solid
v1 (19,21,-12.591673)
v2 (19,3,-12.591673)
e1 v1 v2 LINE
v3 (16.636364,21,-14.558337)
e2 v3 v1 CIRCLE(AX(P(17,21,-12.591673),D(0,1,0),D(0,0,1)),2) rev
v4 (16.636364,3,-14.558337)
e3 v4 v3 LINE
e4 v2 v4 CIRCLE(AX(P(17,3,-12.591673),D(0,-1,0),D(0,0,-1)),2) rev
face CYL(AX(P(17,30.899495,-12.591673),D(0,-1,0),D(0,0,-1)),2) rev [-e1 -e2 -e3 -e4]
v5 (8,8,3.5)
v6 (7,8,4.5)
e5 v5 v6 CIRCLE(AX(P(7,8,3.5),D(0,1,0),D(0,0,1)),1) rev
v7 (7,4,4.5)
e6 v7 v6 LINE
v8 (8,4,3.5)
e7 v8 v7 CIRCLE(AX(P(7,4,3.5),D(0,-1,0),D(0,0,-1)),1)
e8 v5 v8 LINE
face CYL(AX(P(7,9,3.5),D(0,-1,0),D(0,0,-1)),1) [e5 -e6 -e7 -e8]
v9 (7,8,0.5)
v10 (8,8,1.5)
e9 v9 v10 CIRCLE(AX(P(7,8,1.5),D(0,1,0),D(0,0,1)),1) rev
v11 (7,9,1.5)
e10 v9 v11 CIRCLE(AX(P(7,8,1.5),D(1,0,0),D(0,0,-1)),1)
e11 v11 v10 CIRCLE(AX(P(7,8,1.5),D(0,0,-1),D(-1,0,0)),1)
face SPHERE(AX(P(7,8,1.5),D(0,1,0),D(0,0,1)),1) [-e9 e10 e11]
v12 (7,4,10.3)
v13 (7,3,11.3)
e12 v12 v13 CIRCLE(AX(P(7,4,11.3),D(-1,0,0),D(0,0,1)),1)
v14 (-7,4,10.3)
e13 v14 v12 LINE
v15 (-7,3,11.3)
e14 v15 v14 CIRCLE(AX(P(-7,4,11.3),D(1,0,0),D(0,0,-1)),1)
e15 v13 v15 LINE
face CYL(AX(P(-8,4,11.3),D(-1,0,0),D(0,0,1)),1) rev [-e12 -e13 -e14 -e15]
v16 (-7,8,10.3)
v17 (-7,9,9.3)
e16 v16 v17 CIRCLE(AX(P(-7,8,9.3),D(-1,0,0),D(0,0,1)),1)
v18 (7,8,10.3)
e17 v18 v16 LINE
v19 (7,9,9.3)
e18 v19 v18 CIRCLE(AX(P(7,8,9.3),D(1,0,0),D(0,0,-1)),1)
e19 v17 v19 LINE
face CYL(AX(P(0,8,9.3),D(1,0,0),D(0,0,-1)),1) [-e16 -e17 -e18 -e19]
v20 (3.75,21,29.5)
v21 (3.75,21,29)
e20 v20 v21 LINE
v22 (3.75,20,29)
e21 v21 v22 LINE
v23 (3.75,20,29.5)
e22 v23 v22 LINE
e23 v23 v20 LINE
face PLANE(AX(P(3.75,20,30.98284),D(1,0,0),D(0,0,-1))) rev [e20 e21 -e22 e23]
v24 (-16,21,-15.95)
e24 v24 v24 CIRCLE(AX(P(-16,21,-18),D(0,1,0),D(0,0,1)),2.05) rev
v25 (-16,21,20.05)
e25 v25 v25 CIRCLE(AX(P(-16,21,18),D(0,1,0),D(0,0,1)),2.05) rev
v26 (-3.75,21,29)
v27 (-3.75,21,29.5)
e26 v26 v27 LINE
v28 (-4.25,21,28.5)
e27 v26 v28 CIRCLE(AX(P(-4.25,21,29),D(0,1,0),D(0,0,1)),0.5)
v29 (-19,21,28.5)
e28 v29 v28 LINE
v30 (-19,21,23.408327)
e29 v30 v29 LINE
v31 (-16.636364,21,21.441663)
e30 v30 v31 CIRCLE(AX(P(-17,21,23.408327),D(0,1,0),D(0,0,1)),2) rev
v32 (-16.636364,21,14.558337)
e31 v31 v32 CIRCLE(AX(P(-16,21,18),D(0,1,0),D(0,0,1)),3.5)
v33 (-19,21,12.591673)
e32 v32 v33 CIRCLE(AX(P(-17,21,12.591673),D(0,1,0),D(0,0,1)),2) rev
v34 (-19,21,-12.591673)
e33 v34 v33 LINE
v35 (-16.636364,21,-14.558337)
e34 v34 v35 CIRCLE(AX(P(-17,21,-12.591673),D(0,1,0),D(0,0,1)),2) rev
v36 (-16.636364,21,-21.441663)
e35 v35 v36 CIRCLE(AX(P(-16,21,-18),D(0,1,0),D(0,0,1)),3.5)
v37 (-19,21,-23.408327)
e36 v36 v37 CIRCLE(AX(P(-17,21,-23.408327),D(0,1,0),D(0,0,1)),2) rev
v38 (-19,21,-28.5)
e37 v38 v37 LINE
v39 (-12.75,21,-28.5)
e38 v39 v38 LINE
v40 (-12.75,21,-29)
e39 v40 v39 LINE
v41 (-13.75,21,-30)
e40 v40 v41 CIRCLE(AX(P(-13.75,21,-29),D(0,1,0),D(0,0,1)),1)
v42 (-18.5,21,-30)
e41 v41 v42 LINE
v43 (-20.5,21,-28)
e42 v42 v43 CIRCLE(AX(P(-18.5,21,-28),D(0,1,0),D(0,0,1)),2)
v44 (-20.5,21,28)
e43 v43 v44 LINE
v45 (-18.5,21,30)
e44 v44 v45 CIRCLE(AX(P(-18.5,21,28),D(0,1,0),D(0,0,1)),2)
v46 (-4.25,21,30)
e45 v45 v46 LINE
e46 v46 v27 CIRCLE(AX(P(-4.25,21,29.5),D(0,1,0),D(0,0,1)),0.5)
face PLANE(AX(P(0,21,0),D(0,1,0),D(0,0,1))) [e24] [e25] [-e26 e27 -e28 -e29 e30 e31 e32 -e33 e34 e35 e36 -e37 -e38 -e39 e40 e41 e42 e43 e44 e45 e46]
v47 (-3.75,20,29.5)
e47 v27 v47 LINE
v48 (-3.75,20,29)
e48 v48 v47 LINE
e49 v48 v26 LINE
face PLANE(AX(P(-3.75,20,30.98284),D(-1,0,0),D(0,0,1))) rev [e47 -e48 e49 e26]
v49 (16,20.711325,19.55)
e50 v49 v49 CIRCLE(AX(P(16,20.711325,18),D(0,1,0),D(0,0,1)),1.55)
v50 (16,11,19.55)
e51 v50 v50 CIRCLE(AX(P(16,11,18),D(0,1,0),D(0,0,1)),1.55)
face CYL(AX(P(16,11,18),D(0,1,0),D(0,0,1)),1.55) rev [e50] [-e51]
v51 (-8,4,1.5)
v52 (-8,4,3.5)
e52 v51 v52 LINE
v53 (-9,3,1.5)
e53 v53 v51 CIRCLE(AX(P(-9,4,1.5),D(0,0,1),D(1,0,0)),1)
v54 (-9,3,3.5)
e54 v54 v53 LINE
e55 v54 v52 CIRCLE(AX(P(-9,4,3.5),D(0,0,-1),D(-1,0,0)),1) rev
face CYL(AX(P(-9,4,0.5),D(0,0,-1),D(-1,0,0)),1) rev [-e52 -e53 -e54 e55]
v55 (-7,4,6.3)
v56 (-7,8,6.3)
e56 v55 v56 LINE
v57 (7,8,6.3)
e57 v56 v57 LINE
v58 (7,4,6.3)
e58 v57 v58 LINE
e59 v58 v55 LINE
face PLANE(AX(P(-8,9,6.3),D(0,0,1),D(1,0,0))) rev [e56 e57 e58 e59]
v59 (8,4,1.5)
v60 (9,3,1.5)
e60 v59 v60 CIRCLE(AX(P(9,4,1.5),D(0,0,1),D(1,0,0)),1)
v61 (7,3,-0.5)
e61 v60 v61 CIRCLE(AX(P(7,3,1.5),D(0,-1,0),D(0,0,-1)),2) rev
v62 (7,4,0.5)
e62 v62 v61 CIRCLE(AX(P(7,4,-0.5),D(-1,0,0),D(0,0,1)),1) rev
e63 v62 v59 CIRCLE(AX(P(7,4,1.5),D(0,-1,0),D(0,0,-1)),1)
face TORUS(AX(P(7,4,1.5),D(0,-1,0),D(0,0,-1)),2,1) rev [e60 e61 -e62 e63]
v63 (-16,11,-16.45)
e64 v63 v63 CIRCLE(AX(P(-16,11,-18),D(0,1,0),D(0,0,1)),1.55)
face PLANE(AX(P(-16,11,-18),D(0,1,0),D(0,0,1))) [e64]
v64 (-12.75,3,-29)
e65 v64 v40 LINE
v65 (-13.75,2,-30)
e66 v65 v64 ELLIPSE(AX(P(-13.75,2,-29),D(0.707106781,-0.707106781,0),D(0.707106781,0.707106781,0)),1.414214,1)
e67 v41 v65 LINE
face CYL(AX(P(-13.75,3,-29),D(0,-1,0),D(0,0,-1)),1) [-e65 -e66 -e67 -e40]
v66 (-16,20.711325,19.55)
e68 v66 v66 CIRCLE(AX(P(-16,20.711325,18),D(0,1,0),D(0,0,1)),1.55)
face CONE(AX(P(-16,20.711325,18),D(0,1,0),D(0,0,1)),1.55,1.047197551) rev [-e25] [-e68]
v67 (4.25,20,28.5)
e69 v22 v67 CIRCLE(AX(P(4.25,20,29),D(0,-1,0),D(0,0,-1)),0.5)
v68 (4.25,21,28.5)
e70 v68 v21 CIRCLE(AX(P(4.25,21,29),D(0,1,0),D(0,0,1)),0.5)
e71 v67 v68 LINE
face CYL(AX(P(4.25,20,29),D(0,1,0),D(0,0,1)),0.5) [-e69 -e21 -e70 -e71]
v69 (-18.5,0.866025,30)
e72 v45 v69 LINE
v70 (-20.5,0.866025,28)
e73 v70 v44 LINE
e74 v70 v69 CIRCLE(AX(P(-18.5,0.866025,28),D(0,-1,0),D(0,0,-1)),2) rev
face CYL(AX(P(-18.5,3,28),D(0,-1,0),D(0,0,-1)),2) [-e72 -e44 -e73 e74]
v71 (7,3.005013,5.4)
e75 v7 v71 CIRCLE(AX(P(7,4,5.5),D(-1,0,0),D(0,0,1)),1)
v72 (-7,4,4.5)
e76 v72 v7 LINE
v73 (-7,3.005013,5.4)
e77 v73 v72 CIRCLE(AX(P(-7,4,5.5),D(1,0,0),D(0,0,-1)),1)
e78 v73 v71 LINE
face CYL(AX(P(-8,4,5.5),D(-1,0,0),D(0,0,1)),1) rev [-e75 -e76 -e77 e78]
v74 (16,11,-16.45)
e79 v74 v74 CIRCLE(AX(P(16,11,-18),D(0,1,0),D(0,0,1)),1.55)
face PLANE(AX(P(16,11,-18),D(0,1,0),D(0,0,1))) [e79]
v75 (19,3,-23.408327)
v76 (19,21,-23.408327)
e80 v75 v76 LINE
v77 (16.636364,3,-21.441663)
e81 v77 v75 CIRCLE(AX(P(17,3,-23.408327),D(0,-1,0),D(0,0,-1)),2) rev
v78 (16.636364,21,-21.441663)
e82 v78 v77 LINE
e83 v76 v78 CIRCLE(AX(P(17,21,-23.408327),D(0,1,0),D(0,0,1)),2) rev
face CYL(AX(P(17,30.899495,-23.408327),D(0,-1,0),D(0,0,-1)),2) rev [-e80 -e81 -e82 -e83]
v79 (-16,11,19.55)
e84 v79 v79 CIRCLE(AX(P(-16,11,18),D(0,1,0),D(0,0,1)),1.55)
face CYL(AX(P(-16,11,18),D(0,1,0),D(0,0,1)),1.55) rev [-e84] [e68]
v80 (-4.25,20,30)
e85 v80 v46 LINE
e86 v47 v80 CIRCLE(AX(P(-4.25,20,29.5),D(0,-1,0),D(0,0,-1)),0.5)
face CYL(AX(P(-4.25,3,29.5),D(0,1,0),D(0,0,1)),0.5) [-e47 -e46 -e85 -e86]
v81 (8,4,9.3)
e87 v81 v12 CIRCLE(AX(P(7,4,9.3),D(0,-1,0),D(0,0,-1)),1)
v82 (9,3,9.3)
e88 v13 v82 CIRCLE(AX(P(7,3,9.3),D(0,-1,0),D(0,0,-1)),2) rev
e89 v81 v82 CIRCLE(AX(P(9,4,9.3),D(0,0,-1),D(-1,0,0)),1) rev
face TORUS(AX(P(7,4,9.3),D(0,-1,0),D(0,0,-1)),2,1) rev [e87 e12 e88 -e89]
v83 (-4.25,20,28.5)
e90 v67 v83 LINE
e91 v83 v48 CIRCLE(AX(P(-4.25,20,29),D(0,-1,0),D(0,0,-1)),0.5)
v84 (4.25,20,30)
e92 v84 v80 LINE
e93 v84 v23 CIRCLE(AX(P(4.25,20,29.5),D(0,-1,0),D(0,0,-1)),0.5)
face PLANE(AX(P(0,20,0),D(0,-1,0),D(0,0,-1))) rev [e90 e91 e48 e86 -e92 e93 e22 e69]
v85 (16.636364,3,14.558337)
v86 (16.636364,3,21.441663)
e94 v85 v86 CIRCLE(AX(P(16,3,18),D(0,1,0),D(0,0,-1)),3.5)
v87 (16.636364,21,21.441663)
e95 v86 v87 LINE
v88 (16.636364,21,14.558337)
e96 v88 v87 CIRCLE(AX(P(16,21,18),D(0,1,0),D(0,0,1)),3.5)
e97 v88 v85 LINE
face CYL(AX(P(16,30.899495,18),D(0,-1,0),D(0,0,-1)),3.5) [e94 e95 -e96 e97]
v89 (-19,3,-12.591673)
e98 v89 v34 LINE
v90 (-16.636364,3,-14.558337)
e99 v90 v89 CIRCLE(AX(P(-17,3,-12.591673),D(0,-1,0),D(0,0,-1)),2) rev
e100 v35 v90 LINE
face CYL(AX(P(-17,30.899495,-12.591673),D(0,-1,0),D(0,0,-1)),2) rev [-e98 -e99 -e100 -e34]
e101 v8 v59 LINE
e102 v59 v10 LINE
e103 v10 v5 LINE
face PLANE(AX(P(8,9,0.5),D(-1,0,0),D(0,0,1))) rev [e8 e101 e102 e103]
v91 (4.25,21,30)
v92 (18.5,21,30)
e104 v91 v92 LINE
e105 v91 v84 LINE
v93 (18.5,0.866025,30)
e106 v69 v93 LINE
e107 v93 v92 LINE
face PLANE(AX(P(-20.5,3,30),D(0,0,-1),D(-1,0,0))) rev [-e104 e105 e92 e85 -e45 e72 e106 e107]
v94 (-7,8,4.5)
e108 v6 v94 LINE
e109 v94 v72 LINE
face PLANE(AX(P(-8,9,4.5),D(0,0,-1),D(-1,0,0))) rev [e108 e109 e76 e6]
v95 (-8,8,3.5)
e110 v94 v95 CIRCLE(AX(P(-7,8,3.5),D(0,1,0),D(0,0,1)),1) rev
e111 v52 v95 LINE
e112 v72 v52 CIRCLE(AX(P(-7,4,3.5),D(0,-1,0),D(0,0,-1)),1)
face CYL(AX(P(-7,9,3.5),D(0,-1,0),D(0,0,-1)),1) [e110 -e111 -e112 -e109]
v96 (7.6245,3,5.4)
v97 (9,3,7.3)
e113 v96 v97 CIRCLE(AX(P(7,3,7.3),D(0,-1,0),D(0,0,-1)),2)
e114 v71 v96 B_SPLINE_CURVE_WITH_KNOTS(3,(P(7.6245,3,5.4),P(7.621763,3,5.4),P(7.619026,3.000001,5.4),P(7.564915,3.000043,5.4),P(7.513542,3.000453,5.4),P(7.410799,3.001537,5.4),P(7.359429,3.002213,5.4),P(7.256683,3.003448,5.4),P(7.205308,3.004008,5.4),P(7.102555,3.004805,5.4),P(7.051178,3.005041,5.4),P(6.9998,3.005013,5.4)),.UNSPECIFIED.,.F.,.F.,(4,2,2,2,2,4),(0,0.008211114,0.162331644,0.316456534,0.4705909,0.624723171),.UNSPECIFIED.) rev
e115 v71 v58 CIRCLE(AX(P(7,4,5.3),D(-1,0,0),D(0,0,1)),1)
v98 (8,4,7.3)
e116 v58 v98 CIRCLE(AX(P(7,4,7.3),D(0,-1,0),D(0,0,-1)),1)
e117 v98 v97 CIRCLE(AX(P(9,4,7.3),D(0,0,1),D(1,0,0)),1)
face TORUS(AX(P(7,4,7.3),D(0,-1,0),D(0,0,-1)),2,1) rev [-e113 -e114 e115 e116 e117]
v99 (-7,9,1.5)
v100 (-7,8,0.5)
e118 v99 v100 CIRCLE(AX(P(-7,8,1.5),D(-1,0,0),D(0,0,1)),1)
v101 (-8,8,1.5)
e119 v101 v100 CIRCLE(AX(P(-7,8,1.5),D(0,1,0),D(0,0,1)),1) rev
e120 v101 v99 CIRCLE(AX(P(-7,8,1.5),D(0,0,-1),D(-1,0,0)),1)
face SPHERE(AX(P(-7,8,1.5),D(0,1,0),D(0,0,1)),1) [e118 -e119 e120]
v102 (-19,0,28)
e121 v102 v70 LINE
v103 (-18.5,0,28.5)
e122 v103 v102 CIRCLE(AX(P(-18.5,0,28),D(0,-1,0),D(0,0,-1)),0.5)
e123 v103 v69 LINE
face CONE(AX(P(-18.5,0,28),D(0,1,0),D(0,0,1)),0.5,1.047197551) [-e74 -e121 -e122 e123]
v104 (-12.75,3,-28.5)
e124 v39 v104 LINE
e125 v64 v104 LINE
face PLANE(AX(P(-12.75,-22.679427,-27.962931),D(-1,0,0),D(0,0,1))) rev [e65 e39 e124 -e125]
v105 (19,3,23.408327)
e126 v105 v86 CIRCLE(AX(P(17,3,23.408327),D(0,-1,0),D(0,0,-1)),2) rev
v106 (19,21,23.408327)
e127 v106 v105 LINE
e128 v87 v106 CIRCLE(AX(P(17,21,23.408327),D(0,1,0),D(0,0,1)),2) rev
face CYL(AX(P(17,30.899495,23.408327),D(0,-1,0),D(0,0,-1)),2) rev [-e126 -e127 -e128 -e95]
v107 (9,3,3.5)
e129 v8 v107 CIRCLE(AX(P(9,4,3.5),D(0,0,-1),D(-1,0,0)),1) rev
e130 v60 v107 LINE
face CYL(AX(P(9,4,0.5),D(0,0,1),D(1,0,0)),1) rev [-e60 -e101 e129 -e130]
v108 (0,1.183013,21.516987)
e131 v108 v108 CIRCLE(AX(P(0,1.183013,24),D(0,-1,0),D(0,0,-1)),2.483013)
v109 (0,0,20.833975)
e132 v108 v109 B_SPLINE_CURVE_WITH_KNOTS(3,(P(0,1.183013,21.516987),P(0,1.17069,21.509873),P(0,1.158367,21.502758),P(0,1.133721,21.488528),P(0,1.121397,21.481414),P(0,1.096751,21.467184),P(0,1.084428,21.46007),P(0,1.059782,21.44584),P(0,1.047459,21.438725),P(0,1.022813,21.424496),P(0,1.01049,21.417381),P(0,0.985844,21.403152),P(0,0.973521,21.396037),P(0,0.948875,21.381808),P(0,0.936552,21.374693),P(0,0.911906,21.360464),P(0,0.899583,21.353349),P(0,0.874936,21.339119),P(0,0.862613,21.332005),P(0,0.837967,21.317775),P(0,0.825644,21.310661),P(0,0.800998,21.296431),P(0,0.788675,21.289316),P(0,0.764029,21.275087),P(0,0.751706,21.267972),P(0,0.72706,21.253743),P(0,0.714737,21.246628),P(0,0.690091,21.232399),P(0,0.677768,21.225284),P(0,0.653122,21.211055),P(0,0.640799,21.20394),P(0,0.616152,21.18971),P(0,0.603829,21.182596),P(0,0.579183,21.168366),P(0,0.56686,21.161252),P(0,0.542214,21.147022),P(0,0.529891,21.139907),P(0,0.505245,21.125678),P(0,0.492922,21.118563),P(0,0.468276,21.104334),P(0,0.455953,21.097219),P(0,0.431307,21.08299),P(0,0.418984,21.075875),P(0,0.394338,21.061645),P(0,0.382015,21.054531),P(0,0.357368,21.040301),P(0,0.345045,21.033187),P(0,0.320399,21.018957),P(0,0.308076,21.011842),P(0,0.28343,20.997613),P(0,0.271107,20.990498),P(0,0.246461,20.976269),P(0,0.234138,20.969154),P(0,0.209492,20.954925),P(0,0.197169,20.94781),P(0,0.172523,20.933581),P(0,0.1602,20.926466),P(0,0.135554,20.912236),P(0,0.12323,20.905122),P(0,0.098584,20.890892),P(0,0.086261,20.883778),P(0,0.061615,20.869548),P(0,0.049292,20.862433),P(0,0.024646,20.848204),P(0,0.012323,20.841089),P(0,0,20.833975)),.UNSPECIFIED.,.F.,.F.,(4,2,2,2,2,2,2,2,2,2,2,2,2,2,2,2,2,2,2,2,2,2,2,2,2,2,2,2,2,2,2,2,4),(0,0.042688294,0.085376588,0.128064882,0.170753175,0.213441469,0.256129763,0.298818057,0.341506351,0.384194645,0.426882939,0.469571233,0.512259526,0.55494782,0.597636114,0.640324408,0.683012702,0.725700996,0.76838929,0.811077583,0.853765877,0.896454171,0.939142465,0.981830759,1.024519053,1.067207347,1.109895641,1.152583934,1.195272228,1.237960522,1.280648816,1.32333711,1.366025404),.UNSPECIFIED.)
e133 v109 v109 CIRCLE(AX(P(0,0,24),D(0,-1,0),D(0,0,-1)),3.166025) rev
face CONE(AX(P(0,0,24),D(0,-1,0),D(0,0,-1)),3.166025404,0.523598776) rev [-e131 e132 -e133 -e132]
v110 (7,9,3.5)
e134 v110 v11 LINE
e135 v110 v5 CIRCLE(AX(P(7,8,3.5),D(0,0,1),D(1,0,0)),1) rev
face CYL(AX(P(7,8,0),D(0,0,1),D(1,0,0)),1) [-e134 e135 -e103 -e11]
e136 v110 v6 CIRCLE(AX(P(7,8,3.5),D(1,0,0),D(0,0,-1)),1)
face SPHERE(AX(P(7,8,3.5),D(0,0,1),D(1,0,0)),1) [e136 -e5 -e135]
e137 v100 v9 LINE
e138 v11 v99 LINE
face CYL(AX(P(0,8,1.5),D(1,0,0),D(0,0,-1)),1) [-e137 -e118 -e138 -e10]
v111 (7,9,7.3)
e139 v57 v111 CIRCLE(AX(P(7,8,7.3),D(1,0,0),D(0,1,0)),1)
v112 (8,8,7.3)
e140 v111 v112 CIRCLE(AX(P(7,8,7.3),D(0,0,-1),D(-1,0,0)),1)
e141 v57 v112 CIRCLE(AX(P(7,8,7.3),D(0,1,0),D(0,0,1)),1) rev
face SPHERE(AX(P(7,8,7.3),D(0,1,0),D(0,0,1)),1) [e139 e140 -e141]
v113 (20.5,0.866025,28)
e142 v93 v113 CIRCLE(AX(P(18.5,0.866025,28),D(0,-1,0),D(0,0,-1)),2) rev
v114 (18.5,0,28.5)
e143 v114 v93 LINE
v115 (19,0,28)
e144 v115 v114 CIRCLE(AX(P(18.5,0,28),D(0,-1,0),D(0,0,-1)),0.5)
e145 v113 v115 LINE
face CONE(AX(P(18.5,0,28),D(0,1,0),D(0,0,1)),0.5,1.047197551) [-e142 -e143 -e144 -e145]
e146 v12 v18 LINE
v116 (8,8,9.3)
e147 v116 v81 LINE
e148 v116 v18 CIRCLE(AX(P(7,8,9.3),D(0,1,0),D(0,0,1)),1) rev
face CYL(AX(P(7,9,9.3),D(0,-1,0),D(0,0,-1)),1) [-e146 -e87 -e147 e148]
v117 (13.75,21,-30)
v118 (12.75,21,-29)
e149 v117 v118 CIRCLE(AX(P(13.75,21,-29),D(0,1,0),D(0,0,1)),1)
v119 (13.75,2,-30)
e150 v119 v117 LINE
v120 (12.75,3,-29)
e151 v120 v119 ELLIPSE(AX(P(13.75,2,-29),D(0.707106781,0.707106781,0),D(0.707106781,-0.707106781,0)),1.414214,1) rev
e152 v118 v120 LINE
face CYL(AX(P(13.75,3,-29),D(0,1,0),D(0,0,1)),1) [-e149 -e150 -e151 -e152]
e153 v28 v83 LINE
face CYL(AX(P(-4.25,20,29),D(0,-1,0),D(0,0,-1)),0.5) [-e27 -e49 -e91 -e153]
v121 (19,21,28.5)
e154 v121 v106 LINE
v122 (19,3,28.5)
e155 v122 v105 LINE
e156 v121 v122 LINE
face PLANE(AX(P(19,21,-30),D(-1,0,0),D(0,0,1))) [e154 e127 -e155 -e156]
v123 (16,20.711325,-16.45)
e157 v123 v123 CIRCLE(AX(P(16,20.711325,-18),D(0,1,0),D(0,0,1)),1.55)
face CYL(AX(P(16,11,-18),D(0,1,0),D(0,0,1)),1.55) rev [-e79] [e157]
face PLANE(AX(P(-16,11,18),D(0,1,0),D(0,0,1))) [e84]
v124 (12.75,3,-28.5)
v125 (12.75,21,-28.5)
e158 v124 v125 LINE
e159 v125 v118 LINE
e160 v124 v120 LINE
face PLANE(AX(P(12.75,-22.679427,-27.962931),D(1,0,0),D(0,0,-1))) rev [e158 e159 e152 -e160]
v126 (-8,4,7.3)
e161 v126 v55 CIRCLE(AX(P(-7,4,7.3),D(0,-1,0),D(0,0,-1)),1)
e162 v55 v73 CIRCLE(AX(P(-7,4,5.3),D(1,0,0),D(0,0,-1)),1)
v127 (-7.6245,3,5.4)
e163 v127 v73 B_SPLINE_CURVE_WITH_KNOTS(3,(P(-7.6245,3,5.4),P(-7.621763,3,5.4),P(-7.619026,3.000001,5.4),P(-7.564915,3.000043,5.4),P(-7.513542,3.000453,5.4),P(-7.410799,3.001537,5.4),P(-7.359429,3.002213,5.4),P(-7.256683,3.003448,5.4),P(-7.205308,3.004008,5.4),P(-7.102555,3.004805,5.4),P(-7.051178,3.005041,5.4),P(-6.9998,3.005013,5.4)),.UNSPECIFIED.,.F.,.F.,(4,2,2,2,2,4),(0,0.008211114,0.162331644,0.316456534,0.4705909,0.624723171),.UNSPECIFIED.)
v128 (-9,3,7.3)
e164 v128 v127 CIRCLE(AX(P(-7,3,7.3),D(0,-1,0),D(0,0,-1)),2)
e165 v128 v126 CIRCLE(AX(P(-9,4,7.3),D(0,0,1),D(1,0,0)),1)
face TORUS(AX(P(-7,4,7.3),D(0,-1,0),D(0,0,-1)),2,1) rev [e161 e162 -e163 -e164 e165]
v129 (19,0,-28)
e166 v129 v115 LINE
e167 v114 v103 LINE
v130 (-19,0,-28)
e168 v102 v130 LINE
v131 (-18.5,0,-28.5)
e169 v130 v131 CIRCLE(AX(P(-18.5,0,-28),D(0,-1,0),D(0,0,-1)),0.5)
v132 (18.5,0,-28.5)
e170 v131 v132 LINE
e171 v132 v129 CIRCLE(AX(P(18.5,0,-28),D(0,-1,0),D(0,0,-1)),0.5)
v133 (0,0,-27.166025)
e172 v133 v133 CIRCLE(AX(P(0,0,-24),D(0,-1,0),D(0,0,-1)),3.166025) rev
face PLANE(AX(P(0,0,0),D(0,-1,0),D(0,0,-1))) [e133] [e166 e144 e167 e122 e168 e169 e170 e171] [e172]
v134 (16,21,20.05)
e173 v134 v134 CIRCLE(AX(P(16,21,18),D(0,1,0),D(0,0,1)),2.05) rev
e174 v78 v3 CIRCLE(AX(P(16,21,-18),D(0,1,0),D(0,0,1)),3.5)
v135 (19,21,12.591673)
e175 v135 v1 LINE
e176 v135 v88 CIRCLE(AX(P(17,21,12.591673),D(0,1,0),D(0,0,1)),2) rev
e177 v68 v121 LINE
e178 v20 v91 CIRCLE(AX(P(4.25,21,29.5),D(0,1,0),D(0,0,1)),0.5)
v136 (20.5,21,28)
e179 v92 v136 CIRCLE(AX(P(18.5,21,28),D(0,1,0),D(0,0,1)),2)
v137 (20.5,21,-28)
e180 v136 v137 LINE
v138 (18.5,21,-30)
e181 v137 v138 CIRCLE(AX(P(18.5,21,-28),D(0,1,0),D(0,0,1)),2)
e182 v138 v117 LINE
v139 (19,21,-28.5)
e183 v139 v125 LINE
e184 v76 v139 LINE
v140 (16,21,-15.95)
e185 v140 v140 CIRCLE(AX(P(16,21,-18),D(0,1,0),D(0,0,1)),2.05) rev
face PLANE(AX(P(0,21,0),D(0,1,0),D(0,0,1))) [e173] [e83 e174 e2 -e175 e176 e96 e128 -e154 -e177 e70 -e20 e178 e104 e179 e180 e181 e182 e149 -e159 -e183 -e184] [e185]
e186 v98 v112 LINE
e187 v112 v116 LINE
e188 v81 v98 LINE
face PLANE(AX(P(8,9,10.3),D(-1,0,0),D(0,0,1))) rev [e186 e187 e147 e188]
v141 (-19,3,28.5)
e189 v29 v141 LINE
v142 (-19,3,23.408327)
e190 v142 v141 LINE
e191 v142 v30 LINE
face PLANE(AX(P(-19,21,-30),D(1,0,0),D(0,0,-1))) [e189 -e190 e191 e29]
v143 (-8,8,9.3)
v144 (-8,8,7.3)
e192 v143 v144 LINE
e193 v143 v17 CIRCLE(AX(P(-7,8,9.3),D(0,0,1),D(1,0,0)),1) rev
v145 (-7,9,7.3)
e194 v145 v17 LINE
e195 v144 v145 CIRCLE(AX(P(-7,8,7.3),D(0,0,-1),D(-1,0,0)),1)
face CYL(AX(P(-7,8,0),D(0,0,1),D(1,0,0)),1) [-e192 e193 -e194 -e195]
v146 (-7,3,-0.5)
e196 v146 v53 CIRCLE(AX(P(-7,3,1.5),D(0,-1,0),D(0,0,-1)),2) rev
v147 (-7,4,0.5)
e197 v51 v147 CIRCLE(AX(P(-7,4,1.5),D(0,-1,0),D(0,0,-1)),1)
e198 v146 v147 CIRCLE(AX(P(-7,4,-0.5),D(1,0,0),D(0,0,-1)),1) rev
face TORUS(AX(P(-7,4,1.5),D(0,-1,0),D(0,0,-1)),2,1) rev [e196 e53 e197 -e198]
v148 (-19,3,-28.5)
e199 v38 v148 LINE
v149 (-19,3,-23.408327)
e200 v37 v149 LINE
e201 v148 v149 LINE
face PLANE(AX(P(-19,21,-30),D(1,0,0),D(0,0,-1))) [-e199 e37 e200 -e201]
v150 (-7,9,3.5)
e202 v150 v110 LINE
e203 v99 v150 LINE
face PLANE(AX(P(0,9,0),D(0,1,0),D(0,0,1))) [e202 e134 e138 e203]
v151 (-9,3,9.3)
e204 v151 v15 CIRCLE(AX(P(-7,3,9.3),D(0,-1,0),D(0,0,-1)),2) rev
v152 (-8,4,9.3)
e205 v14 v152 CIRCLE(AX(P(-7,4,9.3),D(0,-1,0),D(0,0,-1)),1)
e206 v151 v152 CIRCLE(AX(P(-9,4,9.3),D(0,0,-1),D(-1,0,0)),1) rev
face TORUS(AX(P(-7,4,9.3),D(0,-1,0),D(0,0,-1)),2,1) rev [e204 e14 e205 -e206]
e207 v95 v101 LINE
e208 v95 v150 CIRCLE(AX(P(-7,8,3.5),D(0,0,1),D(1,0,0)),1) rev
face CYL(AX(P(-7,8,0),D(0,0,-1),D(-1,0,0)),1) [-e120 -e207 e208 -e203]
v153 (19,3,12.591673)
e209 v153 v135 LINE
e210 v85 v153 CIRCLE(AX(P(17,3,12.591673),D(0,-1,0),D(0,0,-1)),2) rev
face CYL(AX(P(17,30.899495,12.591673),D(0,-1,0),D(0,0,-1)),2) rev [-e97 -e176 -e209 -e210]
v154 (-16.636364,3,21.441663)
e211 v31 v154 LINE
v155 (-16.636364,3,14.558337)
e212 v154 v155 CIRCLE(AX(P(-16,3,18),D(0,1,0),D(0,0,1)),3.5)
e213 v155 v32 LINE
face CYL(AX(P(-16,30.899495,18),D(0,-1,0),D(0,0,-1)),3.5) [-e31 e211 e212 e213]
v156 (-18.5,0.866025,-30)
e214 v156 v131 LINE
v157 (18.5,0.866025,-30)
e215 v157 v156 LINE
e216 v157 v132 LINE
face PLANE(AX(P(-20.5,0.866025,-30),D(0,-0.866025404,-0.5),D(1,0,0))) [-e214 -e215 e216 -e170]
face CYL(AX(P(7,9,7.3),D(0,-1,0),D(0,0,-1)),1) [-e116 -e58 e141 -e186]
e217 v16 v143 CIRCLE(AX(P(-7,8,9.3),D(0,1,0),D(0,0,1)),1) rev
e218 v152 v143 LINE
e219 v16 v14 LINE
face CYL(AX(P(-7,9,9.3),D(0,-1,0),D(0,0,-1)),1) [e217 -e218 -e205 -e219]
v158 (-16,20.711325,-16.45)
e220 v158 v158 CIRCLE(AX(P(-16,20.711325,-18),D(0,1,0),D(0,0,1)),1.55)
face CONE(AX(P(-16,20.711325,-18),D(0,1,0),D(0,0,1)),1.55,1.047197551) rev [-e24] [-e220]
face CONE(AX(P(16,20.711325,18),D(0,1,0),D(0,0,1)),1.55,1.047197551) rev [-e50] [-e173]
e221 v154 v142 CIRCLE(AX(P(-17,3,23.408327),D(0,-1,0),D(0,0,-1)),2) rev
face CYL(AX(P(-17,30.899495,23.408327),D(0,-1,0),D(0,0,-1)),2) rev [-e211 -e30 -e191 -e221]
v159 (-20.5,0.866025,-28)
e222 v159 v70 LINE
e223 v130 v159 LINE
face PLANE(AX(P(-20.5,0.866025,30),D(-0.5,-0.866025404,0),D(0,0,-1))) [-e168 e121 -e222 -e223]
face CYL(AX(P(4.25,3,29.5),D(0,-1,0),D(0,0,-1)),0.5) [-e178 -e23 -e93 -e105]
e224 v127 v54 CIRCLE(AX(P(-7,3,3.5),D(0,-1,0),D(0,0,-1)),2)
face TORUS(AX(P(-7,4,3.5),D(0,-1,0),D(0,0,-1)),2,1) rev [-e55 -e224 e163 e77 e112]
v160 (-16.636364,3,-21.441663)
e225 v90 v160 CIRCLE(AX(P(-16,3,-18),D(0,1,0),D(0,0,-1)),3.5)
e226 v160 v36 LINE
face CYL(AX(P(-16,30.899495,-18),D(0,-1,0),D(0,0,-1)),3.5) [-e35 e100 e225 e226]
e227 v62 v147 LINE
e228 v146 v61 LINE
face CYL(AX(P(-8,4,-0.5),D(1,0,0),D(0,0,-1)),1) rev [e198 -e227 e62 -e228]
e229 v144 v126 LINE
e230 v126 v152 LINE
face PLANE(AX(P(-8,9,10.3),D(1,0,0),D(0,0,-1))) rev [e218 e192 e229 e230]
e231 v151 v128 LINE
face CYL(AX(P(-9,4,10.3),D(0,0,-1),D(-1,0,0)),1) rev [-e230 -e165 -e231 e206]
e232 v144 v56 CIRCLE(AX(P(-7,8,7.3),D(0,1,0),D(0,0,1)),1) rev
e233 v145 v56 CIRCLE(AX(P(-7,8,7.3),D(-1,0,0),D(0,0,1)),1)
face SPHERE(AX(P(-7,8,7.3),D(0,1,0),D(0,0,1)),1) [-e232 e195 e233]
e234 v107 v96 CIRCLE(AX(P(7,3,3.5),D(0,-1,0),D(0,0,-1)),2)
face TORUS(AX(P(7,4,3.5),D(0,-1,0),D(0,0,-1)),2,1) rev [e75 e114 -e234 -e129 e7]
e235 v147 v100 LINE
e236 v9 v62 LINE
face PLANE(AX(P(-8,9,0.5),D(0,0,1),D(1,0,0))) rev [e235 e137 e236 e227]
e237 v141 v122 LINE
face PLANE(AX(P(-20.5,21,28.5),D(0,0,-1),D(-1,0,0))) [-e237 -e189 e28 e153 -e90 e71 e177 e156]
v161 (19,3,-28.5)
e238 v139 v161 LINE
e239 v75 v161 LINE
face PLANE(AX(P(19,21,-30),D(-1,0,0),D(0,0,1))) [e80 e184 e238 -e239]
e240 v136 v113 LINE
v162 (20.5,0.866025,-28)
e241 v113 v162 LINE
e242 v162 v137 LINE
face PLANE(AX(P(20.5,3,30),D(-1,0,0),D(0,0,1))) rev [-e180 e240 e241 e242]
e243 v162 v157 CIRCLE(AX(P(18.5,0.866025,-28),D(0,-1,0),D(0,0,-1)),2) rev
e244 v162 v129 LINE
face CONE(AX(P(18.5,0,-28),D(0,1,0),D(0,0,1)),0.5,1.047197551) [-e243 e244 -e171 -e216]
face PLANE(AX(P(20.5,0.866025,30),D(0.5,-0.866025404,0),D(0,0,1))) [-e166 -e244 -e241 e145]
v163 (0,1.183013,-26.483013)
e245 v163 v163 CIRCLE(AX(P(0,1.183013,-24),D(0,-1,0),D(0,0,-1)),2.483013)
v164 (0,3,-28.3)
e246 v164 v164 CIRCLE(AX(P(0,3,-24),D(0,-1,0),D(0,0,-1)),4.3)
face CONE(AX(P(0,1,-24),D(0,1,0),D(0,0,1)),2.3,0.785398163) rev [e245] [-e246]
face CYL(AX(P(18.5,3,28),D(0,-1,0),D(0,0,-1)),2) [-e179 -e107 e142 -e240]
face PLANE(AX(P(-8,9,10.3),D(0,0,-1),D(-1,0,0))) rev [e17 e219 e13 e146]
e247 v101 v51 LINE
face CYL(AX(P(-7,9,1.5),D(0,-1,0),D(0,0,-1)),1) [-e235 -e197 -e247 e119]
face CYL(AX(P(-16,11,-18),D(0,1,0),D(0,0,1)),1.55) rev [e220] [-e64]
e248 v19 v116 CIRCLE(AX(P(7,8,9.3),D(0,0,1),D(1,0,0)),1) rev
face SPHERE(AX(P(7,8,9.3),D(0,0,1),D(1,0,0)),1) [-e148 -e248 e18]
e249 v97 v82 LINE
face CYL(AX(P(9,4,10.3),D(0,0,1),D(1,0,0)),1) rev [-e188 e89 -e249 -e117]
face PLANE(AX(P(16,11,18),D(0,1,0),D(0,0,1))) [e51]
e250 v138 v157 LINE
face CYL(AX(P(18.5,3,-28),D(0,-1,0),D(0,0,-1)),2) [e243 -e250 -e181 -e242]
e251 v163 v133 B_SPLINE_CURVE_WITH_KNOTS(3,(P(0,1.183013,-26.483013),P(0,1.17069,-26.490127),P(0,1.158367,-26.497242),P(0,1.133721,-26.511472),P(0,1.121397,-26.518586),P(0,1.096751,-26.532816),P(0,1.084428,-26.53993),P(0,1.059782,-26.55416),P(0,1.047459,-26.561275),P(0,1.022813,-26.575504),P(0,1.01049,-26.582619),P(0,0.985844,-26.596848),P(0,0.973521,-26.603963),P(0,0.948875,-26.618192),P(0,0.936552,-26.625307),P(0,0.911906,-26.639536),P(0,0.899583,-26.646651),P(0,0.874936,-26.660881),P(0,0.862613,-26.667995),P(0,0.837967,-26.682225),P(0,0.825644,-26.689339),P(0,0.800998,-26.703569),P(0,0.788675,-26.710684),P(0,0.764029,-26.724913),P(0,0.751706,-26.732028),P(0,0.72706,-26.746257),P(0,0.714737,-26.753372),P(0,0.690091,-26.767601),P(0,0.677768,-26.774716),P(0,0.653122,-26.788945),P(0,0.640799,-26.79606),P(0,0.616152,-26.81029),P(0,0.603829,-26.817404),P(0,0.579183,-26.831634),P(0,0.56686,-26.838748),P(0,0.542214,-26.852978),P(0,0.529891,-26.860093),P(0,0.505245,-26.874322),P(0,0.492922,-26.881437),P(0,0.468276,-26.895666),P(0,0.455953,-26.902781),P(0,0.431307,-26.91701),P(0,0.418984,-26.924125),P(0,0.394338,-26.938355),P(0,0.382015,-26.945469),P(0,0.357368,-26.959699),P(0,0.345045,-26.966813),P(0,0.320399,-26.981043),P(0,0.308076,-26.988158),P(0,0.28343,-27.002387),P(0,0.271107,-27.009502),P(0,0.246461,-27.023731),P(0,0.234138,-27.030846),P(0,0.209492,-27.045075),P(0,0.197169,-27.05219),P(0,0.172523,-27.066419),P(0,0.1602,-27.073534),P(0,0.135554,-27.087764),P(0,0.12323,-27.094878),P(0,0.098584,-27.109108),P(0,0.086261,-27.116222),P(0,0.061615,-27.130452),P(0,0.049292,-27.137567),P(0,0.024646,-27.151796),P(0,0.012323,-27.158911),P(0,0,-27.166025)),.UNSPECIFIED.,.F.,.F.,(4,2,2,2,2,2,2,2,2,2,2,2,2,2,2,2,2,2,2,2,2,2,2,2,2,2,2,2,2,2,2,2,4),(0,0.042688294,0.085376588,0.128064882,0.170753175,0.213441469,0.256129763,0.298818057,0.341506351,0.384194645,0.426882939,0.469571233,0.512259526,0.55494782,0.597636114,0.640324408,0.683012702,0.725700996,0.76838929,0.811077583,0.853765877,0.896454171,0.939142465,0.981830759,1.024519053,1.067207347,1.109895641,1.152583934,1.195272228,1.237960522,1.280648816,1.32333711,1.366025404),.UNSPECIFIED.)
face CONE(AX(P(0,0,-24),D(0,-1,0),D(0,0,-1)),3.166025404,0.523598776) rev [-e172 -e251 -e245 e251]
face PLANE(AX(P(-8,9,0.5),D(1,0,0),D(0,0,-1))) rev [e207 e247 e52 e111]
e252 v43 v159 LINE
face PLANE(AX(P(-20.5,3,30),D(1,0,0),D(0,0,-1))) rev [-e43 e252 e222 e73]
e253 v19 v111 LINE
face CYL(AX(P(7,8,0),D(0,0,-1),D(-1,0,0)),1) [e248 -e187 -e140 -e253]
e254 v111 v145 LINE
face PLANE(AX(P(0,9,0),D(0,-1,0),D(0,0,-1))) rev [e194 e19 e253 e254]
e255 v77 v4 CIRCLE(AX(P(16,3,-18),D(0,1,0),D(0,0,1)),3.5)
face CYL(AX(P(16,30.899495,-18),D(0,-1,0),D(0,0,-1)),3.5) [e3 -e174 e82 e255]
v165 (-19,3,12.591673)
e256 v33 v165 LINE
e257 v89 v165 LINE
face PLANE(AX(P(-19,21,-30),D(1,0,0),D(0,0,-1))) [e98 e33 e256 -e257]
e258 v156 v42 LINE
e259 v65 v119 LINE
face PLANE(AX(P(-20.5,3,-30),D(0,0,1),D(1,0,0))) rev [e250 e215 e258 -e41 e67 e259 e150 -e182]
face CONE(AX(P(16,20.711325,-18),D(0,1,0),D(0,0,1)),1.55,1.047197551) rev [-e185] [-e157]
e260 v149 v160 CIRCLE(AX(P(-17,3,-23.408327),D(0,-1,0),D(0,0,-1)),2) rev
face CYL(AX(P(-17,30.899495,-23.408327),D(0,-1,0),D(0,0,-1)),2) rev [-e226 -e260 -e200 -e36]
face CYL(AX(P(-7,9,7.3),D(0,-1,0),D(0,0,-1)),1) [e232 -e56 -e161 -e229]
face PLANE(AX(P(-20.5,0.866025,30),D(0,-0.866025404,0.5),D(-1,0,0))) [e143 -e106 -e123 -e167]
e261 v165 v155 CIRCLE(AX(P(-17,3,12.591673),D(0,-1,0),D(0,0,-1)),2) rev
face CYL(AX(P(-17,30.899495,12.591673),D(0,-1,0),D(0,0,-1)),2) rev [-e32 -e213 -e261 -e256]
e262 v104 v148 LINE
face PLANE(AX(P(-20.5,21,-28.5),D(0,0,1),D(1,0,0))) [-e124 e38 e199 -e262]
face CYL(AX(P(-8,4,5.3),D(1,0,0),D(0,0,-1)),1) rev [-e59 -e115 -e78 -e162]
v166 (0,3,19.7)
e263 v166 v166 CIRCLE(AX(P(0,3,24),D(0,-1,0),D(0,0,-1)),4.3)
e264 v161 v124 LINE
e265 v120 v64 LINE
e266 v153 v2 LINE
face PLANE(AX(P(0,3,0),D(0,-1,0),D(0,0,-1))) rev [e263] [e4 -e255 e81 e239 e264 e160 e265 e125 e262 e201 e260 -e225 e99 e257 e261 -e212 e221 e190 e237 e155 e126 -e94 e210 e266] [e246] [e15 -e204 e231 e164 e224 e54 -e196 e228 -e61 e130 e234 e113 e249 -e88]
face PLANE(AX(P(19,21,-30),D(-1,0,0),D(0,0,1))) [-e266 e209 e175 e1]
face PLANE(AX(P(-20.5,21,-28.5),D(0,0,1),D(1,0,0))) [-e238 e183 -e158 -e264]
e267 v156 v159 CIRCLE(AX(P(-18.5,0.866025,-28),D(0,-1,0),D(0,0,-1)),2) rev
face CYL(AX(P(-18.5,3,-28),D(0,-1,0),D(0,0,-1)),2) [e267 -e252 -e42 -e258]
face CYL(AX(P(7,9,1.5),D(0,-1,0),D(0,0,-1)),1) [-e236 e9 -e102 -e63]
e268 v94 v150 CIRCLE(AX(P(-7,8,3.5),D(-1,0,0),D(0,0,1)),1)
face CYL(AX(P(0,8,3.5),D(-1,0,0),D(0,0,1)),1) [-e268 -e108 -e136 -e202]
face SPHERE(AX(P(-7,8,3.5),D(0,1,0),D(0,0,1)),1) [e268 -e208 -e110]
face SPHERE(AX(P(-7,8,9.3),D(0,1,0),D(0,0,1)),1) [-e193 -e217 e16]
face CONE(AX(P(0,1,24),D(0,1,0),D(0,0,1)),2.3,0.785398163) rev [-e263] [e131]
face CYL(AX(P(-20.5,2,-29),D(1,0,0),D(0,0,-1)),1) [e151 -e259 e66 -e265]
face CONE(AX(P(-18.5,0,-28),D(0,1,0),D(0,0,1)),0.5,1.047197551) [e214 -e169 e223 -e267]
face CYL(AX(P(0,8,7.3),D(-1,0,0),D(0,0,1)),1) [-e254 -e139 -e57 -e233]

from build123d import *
from OCP.BRepFilletAPI import BRepFilletAPI_MakeChamfer

# Parameters (mm, degrees)
SKETCH_1_W          = 41
SKETCH_1_H          = 60
SKETCH_1_R          = 2.3
EXTRUDE_1_DEPTH     = 3
CHAMFER_1_SIZE      = 2
SKETCH_2_W          = 41
SKETCH_2_H          = 60
SKETCH_2_W_2        = 38
SKETCH_2_H_2        = 57
EXTRUDE_1_2_DEPTH   = 18
SKETCH_3_W          = 25.5
SKETCH_3_H          = 3.030341357
CUT_EXTRUDE_1_DEPTH = 18
SKETCH_4_R          = 3.5
EXTRUDE_2_DEPTH     = 18
SKETCH_5_R          = 1.55
CUT_EXTRUDE_2_DEPTH = 10
SKETCH_6_W          = 16
SKETCH_6_H          = 4
EXTRUDE_3_DEPTH     = 6
SKETCH_7_W          = 7.5
SKETCH_7_H          = 4.667229269
CUT_EXTRUDE_3_DEPTH = 1
FILLET_2_R          = 0.5
FILLET_3_R          = 2
CHAMFER_4_SIZE      = 0.866025404
CHAMFER_4_SIZE_2    = 1.5
FILLET_4_R          = 1
CHAMFER_6_SIZE      = 0.5
CHAMFER_6_SIZE2     = 0.288675135
FILLET_5_R          = 1
FILLET_7_R          = 2


with BuildPart() as part:
    # Эскиз1 → Extrude 1 (new body)
    with BuildSketch(Plane(origin=(0, 0, 0), x_dir=(1, 0, 0), z_dir=(0, 1, 0))):
        Rectangle(SKETCH_1_W, SKETCH_1_H)
        with Locations(Location((0, 24, 0), (0, 0, 270))):
            Circle(SKETCH_1_R, mode=Mode.SUBTRACT)
        with Locations(Location((0, -24, 0), (0, 0, 270))):
            Circle(SKETCH_1_R, mode=Mode.SUBTRACT)
    extrude(amount=EXTRUDE_1_DEPTH)

    # Фаска1
    chamfer_1_edges = [part.edges().sort_by_distance(p)[0] for p in [
        (0, 3, -26.3),
        (0, 3, 21.7),
    ]]
    chamfer(chamfer_1_edges, length=CHAMFER_1_SIZE)

    # Эскиз2 → Extrude 1 2 (add)
    with BuildSketch(Plane(origin=(0, 3, 0), x_dir=(1, 0, 0), z_dir=(0, 1, 0))):
        Rectangle(SKETCH_2_W, SKETCH_2_H)
        Rectangle(SKETCH_2_W_2, SKETCH_2_H_2, mode=Mode.SUBTRACT)
    extrude(amount=EXTRUDE_1_2_DEPTH)

    # Эскиз3 → Вырез-Вытянуть1 (cut)
    with BuildSketch(Plane(origin=(0, 21, 0), x_dir=(1, 0, 0), z_dir=(0, 1, 0))):
        with Locations((0, 29.478101209)):
            Rectangle(SKETCH_3_W, SKETCH_3_H)
    extrude(amount=-CUT_EXTRUDE_1_DEPTH, mode=Mode.SUBTRACT)

    # Эскиз4 → Бобышка-Вытянуть2 (add)
    with BuildSketch(Plane(origin=(0, 3, 0), x_dir=(1, 0, 0), z_dir=(0, 1, 0))):
        with Locations((16, 18)):
            Circle(SKETCH_4_R)
        with Locations((-16, 18)):
            Circle(SKETCH_4_R)
        with Locations((16, -18)):
            Circle(SKETCH_4_R)
        with Locations((-16, -18)):
            Circle(SKETCH_4_R)
    extrude(amount=EXTRUDE_2_DEPTH)

    # Эскиз5 → Вырез-Вытянуть2 (cut)
    with BuildSketch(Plane(origin=(0, 21, 0), x_dir=(1, 0, 0), z_dir=(0, 1, 0))):
        with Locations(Location((16, 18, 0), (0, 0, 270))):
            Circle(SKETCH_5_R)
        with Locations(Location((16, -18, 0), (0, 0, 270))):
            Circle(SKETCH_5_R)
        with Locations(Location((-16, -18, 0), (0, 0, 270))):
            Circle(SKETCH_5_R)
        with Locations(Location((-16, 18, 0), (0, 0, 270))):
            Circle(SKETCH_5_R)
    extrude(amount=-CUT_EXTRUDE_2_DEPTH, mode=Mode.SUBTRACT)

    # Эскиз6 → Бобышка-Вытянуть3 (add)
    with BuildSketch(Plane(origin=(0, 3, 0), x_dir=(1, 0, 0), z_dir=(0, 1, 0))):
        with Locations((0, -2.5)):
            Rectangle(SKETCH_6_W, SKETCH_6_H)
        with Locations((0, -8.3)):
            Rectangle(SKETCH_6_W, SKETCH_6_H)
    extrude(amount=EXTRUDE_3_DEPTH)

    # Эскиз7 → Вырез-Вытянуть3 (cut)
    with BuildSketch(Plane(origin=(0, 21, 0), x_dir=(1, 0, 0), z_dir=(0, 1, 0))):
        with Locations((0, -28.649225697)):
            Rectangle(SKETCH_7_W, SKETCH_7_H)
    extrude(amount=-CUT_EXTRUDE_3_DEPTH, mode=Mode.SUBTRACT)

    # Скругление2
    fillet_2_edges = [part.edges().sort_by_distance(p)[0] for p in [
        (-3.75, 20.5, 28.5),
        (3.75, 20.5, 28.5),
        (3.75, 20.5, 30),
        (-3.75, 20.5, 30),
    ]]
    fillet(fillet_2_edges, radius=FILLET_2_R)

    # Скругление3
    fillet_3_edges = [part.edges().sort_by_distance(p)[0] for p in [
        (20.5, 10.5, 30),
        (-20.5, 10.5, 30),
        (-20.5, 10.5, -30),
        (20.5, 10.5, -30),
    ]]
    fillet(fillet_3_edges, radius=FILLET_3_R)

    # Фаска4
    # the kernel refuses this chamfer: 1.5, 0.866025404 mm, written as the material it takes off along each edge
    with BuildSketch(Plane(origin=(0, 0, 24), x_dir=(0, 0, 1), z_dir=(-1, 0, 0))) as chamfer_4_piece_1:
        Polygon((2.3 + CHAMFER_4_SIZE, 0), (2.3, CHAMFER_4_SIZE_2), (2.3, 0), align=None)
    revolve(axis=Axis((0, 0, 24), (0, 1, 0)), mode=Mode.SUBTRACT)
    with BuildSketch(Plane(origin=(18.5, 0, -30), x_dir=(0, -0.01932676561270073, 0.999813220622208), z_dir=(-1, 0, 0))) as chamfer_4_piece_2:
        Polygon((CHAMFER_4_SIZE_2 * 0.999813220622, CHAMFER_4_SIZE_2 * 0.0193267656127), (-CHAMFER_4_SIZE * 0.0193267656079, CHAMFER_4_SIZE * 0.999813220373), (0, 0), align=None)
    extrude(amount=37, mode=Mode.SUBTRACT)
    with BuildSketch(Plane(origin=(-20.5, 0, -28), x_dir=(0.999813220622208, -0.01932676561270073, 0), z_dir=(0, 0, 1)), Plane(origin=(20.5, 0, 28), x_dir=(-0.999813220622208, -0.01932676561270073, 0), z_dir=(0, 0, -1))) as chamfer_4_piece_3:
        Polygon((CHAMFER_4_SIZE_2 * 0.999813220622, CHAMFER_4_SIZE_2 * 0.0193267656127), (-CHAMFER_4_SIZE * 0.0193267656079, CHAMFER_4_SIZE * 0.999813220373), (0, 0), align=None)
    extrude(amount=56, mode=Mode.SUBTRACT)
    with BuildSketch(Plane(origin=(-18.5, 0, 30), x_dir=(0, 0.9983227437537924, 0.0578938624026721), z_dir=(1, 0, 0))) as chamfer_4_piece_4:
        Polygon((CHAMFER_4_SIZE * 0.998322743505, -CHAMFER_4_SIZE * 0.0578938623883), (-CHAMFER_4_SIZE_2 * 0.0578938624027, -CHAMFER_4_SIZE_2 * 0.998322743754), (0, 0), align=None)
    extrude(amount=37, mode=Mode.SUBTRACT)
    with BuildSketch(Plane(origin=(-18.5, 0, -28), x_dir=(0, 0, -1), z_dir=(1, 0, 0))) as chamfer_4_piece_5:
        Polygon((2 - CHAMFER_4_SIZE_2, 0), (2, CHAMFER_4_SIZE), (2, 0), align=None)
    revolve(axis=Axis((-18.5, 0, -28), (0, 1, 0)), revolution_arc=90, mode=Mode.SUBTRACT)
    with BuildSketch(Plane(origin=(-18.5, 0, 28), x_dir=(0, 0, 1), z_dir=(1, 0, 0))) as chamfer_4_piece_6:
        Polygon((2 - CHAMFER_4_SIZE_2, 0), (2, -CHAMFER_4_SIZE), (2, 0), align=None)
    revolve(axis=Axis((-18.5, 0, 28), (0, -1, 0)), revolution_arc=90, mode=Mode.SUBTRACT)
    with BuildSketch(Plane(origin=(18.5, 0, 28), x_dir=(0, 0, 1), z_dir=(-1, 0, 0))) as chamfer_4_piece_7:
        Polygon((2, CHAMFER_4_SIZE), (2 - CHAMFER_4_SIZE_2, 0), (2, 0), align=None)
    revolve(axis=Axis((18.5, 0, 28), (0, 1, 0)), revolution_arc=90, mode=Mode.SUBTRACT)
    with BuildSketch(Plane(origin=(18.5, 0, -28), x_dir=(0, 0, -1), z_dir=(-1, 0, 0))) as chamfer_4_piece_8:
        Polygon((2 - CHAMFER_4_SIZE_2, 0), (2, -CHAMFER_4_SIZE), (2, 0), align=None)
    revolve(axis=Axis((18.5, 0, -28), (0, -1, 0)), revolution_arc=90, mode=Mode.SUBTRACT)
    with BuildSketch(Plane(origin=(0, 0, -24), x_dir=(0, 0, 1), z_dir=(-1, 0, 0))) as chamfer_4_piece_9:
        Polygon((2.3 + CHAMFER_4_SIZE, 0), (2.3, CHAMFER_4_SIZE_2), (2.3, 0), align=None)
    revolve(axis=Axis((0, 0, -24), (0, 1, 0)), mode=Mode.SUBTRACT)

    # Скругление4
    # the kernel refuses this fillet: 1 mm, written as the material it takes off along each edge
    with BuildSketch(Plane(origin=(-7, 8, 1.5), x_dir=(0, 0, -1), z_dir=(-1, 0, 0))) as fillet_4_piece_1_section:
        Polygon((0, 0), (FILLET_4_R, 0), (FILLET_4_R, -FILLET_4_R), (0, -FILLET_4_R), align=None)
    fillet_4_piece_1 = extrude(amount=FILLET_4_R, mode=Mode.PRIVATE)
    fillet_4_piece_1 = fillet_4_piece_1 - Plane(origin=(-7, 8, 1.5), x_dir=(0, -0.7071067811865475, 0.7071067811865475), z_dir=(-1, 0, 0)) * Sphere(FILLET_4_R, mode=Mode.PRIVATE)
    add(fillet_4_piece_1, mode=Mode.SUBTRACT)
    with BuildSketch(Plane(origin=(-7, 8, 3.5), x_dir=(0, 0, 1), z_dir=(-1, 0, 0))) as fillet_4_piece_2_section:
        Polygon((0, 0), (FILLET_4_R, 0), (FILLET_4_R, FILLET_4_R), (0, FILLET_4_R), align=None)
    fillet_4_piece_2 = extrude(amount=FILLET_4_R, mode=Mode.PRIVATE)
    fillet_4_piece_2 = fillet_4_piece_2 - Plane(origin=(-7, 8, 3.5), x_dir=(0, -0.7071067811865475, -0.7071067811865475), z_dir=(-1, 0, 0)) * Sphere(FILLET_4_R, mode=Mode.PRIVATE)
    add(fillet_4_piece_2, mode=Mode.SUBTRACT)
    with BuildSketch(Plane(origin=(7, 8, 3.5), x_dir=(1, 0, 0), z_dir=(0, 0, 1))) as fillet_4_piece_3_section:
        Polygon((0, 0), (FILLET_4_R, 0), (FILLET_4_R, FILLET_4_R), (0, FILLET_4_R), align=None)
    fillet_4_piece_3 = extrude(amount=FILLET_4_R, mode=Mode.PRIVATE)
    fillet_4_piece_3 = fillet_4_piece_3 - Plane(origin=(7, 8, 3.5), x_dir=(-0.7071067811865475, -0.7071067811865475, 0), z_dir=(0, 0, 1)) * Sphere(FILLET_4_R, mode=Mode.PRIVATE)
    add(fillet_4_piece_3, mode=Mode.SUBTRACT)
    with BuildSketch(Plane(origin=(7, 8, 1.5), x_dir=(0, 0, -1), z_dir=(1, 0, 0))) as fillet_4_piece_4_section:
        Polygon((0, 0), (FILLET_4_R, 0), (FILLET_4_R, FILLET_4_R), (0, FILLET_4_R), align=None)
    fillet_4_piece_4 = extrude(amount=FILLET_4_R, mode=Mode.PRIVATE)
    fillet_4_piece_4 = fillet_4_piece_4 - Plane(origin=(7, 8, 1.5), x_dir=(0, -0.7071067811865475, 0.7071067811865475), z_dir=(1, 0, 0)) * Sphere(FILLET_4_R, mode=Mode.PRIVATE)
    add(fillet_4_piece_4, mode=Mode.SUBTRACT)
    with BuildSketch(Plane(origin=(-7, 8, 7.3), x_dir=(-1, 0, 0), z_dir=(0, 0, -1))) as fillet_4_piece_5_section:
        Polygon((0, 0), (FILLET_4_R, 0), (FILLET_4_R, FILLET_4_R), (0, FILLET_4_R), align=None)
    fillet_4_piece_5 = extrude(amount=FILLET_4_R, mode=Mode.PRIVATE)
    fillet_4_piece_5 = fillet_4_piece_5 - Plane(origin=(-7, 8, 7.3), x_dir=(0.7071067811865475, -0.7071067811865475, 0), z_dir=(0, 0, -1)) * Sphere(FILLET_4_R, mode=Mode.PRIVATE)
    add(fillet_4_piece_5, mode=Mode.SUBTRACT)
    with BuildSketch(Plane(origin=(-7, 8, 9.3), x_dir=(-1, 0, 0), z_dir=(0, 1, 0))) as fillet_4_piece_6_section:
        Polygon((0, 0), (FILLET_4_R, 0), (FILLET_4_R, FILLET_4_R), (0, FILLET_4_R), align=None)
    fillet_4_piece_6 = extrude(amount=FILLET_4_R, mode=Mode.PRIVATE)
    fillet_4_piece_6 = fillet_4_piece_6 - Plane(origin=(-7, 8, 9.3), x_dir=(0.7071067811865475, 0, -0.7071067811865475), z_dir=(0, 1, 0)) * Sphere(FILLET_4_R, mode=Mode.PRIVATE)
    add(fillet_4_piece_6, mode=Mode.SUBTRACT)
    with BuildSketch(Plane(origin=(7, 8, 9.3), x_dir=(0, 0, 1), z_dir=(0, 1, 0))) as fillet_4_piece_7_section:
        Polygon((0, 0), (FILLET_4_R, 0), (FILLET_4_R, FILLET_4_R), (0, FILLET_4_R), align=None)
    fillet_4_piece_7 = extrude(amount=FILLET_4_R, mode=Mode.PRIVATE)
    fillet_4_piece_7 = fillet_4_piece_7 - Plane(origin=(7, 8, 9.3), x_dir=(-0.7071067811865475, 0, -0.7071067811865475), z_dir=(0, 1, 0)) * Sphere(FILLET_4_R, mode=Mode.PRIVATE)
    add(fillet_4_piece_7, mode=Mode.SUBTRACT)
    with BuildSketch(Plane(origin=(7, 8, 7.3), x_dir=(0, 1, 0), z_dir=(0, 0, -1))) as fillet_4_piece_8_section:
        Polygon((0, 0), (FILLET_4_R, 0), (FILLET_4_R, FILLET_4_R), (0, FILLET_4_R), align=None)
    fillet_4_piece_8 = extrude(amount=FILLET_4_R, mode=Mode.PRIVATE)
    fillet_4_piece_8 = fillet_4_piece_8 - Plane(origin=(7, 8, 7.3), x_dir=(-0.7071067811865475, -0.7071067811865475, 0), z_dir=(0, 0, -1)) * Sphere(FILLET_4_R, mode=Mode.PRIVATE)
    add(fillet_4_piece_8, mode=Mode.SUBTRACT)
    with BuildSketch(Plane(origin=(-8, 3, 0.5), x_dir=(0, 0, 1), z_dir=(0, 1, 0)), Plane(origin=(-8, 3, 6.3), x_dir=(0, 0, 1), z_dir=(0, 1, 0))) as fillet_4_piece_9:
        with BuildLine():
            CenterArc((FILLET_4_R, FILLET_4_R), FILLET_4_R, 180, 90)
            Line((0, FILLET_4_R), (0, 0))
            Line((0, 0), (FILLET_4_R, 0))
        make_face()
    extrude(amount=5, mode=Mode.SUBTRACT)
    with BuildSketch(Plane(origin=(-8, 3, 4.5), x_dir=(0, 0, -1), z_dir=(0, 1, 0)), Plane(origin=(8, 3, 4.5), x_dir=(-1, 0, 0), z_dir=(0, 1, 0)), Plane(origin=(8, 3, 0.5), x_dir=(0, 0, 1), z_dir=(0, 1, 0)), Plane(origin=(-8, 3, 10.3), x_dir=(0, 0, -1), z_dir=(0, 1, 0)), Plane(origin=(8, 3, 10.3), x_dir=(-1, 0, 0), z_dir=(0, 1, 0)), Plane(origin=(8, 3, 6.3), x_dir=(0, 0, 1), z_dir=(0, 1, 0))) as fillet_4_piece_10:
        with BuildLine():
            CenterArc((FILLET_4_R, -FILLET_4_R), FILLET_4_R, 90, 90)
            Line((0, -FILLET_4_R), (0, 0))
            Line((0, 0), (FILLET_4_R, 0))
        make_face()
    extrude(amount=5, mode=Mode.SUBTRACT)
    with BuildSketch(Plane(origin=(-8, 9, 3.5), x_dir=(0, -1, 0), z_dir=(0, 0, -1)), Plane(origin=(8, 9, 1.5), x_dir=(0, -1, 0), z_dir=(0, 0, 1)), Plane(origin=(-8, 9, 9.3), x_dir=(0, -1, 0), z_dir=(0, 0, -1)), Plane(origin=(8, 9, 7.3), x_dir=(0, -1, 0), z_dir=(0, 0, 1))) as fillet_4_piece_11:
        with BuildLine():
            CenterArc((FILLET_4_R, -FILLET_4_R), FILLET_4_R, 90, 90)
            Line((0, -FILLET_4_R), (0, 0))
            Line((0, 0), (FILLET_4_R, 0))
        make_face()
    extrude(amount=2, mode=Mode.SUBTRACT)
    with BuildSketch(Plane(origin=(7, 9, 4.5), x_dir=(0, -1, 0), z_dir=(-1, 0, 0)), Plane(origin=(-7, 9, 0.5), x_dir=(0, -1, 0), z_dir=(1, 0, 0)), Plane(origin=(7, 9, 10.3), x_dir=(0, -1, 0), z_dir=(-1, 0, 0)), Plane(origin=(-7, 9, 6.3), x_dir=(0, -1, 0), z_dir=(1, 0, 0))) as fillet_4_piece_12:
        with BuildLine():
            CenterArc((FILLET_4_R, -FILLET_4_R), FILLET_4_R, 90, 90)
            Line((0, -FILLET_4_R), (0, 0))
            Line((0, 0), (FILLET_4_R, 0))
        make_face()
    extrude(amount=14, mode=Mode.SUBTRACT)
    # the kernel refuses this fillet: 1 mm, written as the material it adds along each edge
    with BuildSketch(Plane(origin=(-8, 3, 3.5), x_dir=(-1, 0, 0), z_dir=(0, 0, -1)), Plane(origin=(8, 3, 1.5), x_dir=(1, 0, 0), z_dir=(0, 0, 1)), Plane(origin=(-8, 3, 9.3), x_dir=(-1, 0, 0), z_dir=(0, 0, -1)), Plane(origin=(8, 3, 7.3), x_dir=(1, 0, 0), z_dir=(0, 0, 1))) as fillet_4_2_piece_1:
        with BuildLine():
            CenterArc((FILLET_4_R, FILLET_4_R), FILLET_4_R, 180, 90)
            Line((0, FILLET_4_R), (0, 0))
            Line((0, 0), (FILLET_4_R, 0))
        make_face()
    extrude(amount=2)
    with BuildSketch(Plane(origin=(7, 3, 4.5), x_dir=(0, 0, 1), z_dir=(-1, 0, 0)), Plane(origin=(-7, 3, 0.5), x_dir=(0, 0, -1), z_dir=(1, 0, 0)), Plane(origin=(7, 3, 10.3), x_dir=(0, 0, 1), z_dir=(-1, 0, 0)), Plane(origin=(-7, 3, 6.3), x_dir=(0, 0, -1), z_dir=(1, 0, 0))) as fillet_4_2_piece_2:
        with BuildLine():
            CenterArc((FILLET_4_R, FILLET_4_R), FILLET_4_R, 180, 90)
            Line((0, FILLET_4_R), (0, 0))
            Line((0, 0), (FILLET_4_R, 0))
        make_face()
    extrude(amount=14)
    with BuildSketch(Plane(origin=(-7, 3, 7.3), x_dir=(-1, 0, 0), z_dir=(0, 0, 1))) as fillet_4_2_piece_3:
        with BuildLine():
            CenterArc((1 + FILLET_4_R, -FILLET_4_R), FILLET_4_R, 90, 90)
            Line((1, -FILLET_4_R), (1, 0))
            Line((1, 0), (1 + FILLET_4_R, 0))
        make_face()
    revolve(axis=Axis((-7, 3, 7.3), (0, -1, 0)), revolution_arc=90)
    with BuildSketch(Plane(origin=(7, 3, 7.3), x_dir=(1, 0, 0), z_dir=(0, 0, 1))) as fillet_4_2_piece_4:
        with BuildLine():
            CenterArc((1 + FILLET_4_R, FILLET_4_R), FILLET_4_R, 180, 90)
            Line((1, FILLET_4_R), (1, 0))
            Line((1, 0), (1 + FILLET_4_R, 0))
        make_face()
    revolve(axis=Axis((7, 3, 7.3), (0, 1, 0)), revolution_arc=90)
    with BuildSketch(Plane(origin=(7, 3, 9.3), x_dir=(0, 0, 1), z_dir=(-1, 0, 0))) as fillet_4_2_piece_5:
        with BuildLine():
            CenterArc((1 + FILLET_4_R, FILLET_4_R), FILLET_4_R, 180, 90)
            Line((1, FILLET_4_R), (1, 0))
            Line((1, 0), (1 + FILLET_4_R, 0))
        make_face()
    revolve(axis=Axis((7, 3, 9.3), (0, 1, 0)), revolution_arc=90)
    with BuildSketch(Plane(origin=(-7, 3, 9.3), x_dir=(-1, 0, 0), z_dir=(0, 0, -1))) as fillet_4_2_piece_6:
        with BuildLine():
            CenterArc((1 + FILLET_4_R, FILLET_4_R), FILLET_4_R, 180, 90)
            Line((1, FILLET_4_R), (1, 0))
            Line((1, 0), (1 + FILLET_4_R, 0))
        make_face()
    revolve(axis=Axis((-7, 3, 9.3), (0, 1, 0)), revolution_arc=90)
    with BuildSketch(Plane(origin=(-7, 3, 1.5), x_dir=(-1, 0, 0), z_dir=(0, 0, 1))) as fillet_4_2_piece_7:
        with BuildLine():
            CenterArc((1 + FILLET_4_R, -FILLET_4_R), FILLET_4_R, 90, 90)
            Line((1, -FILLET_4_R), (1, 0))
            Line((1, 0), (1 + FILLET_4_R, 0))
        make_face()
    revolve(axis=Axis((-7, 3, 1.5), (0, -1, 0)), revolution_arc=90)
    with BuildSketch(Plane(origin=(7, 3, 1.5), x_dir=(1, 0, 0), z_dir=(0, 0, 1))) as fillet_4_2_piece_8:
        with BuildLine():
            CenterArc((1 + FILLET_4_R, FILLET_4_R), FILLET_4_R, 180, 90)
            Line((1, FILLET_4_R), (1, 0))
            Line((1, 0), (1 + FILLET_4_R, 0))
        make_face()
    revolve(axis=Axis((7, 3, 1.5), (0, 1, 0)), revolution_arc=90)
    with BuildSketch(Plane(origin=(7, 3, 3.5), x_dir=(0, 0, 1), z_dir=(-1, 0, 0))) as fillet_4_2_piece_9:
        with BuildLine():
            CenterArc((1 + FILLET_4_R, FILLET_4_R), FILLET_4_R, 180, 90)
            Line((1, FILLET_4_R), (1, 0))
            Line((1, 0), (1 + FILLET_4_R, 0))
        make_face()
    revolve(axis=Axis((7, 3, 3.5), (0, 1, 0)), revolution_arc=90)
    with BuildSketch(Plane(origin=(-7, 3, 3.5), x_dir=(-1, 0, 0), z_dir=(0, 0, -1))) as fillet_4_2_piece_10:
        with BuildLine():
            CenterArc((1 + FILLET_4_R, FILLET_4_R), FILLET_4_R, 180, 90)
            Line((1, FILLET_4_R), (1, 0))
            Line((1, 0), (1 + FILLET_4_R, 0))
        make_face()
    revolve(axis=Axis((-7, 3, 3.5), (0, 1, 0)), revolution_arc=90)

    # Фаска6: one chamfer whose edges measure the first distance from different faces: ONE call of the kernel's chamfer builder (chamfer() names one face for all edges)
    chamfer_6_edges_1 = [part.edges().sort_by_distance(p)[0] for p in [
        (-16, 21, -19.55),
        (-16, 21, 16.45),
    ]]
    chamfer_6_side_1 = [part.faces().sort_by_distance(p)[0] for p in [
        (-11.375, 21, 29.37705839),
    ]]
    chamfer_6_edges_2 = [part.edges().sort_by_distance(p)[0] for p in [
        (16, 21, 16.45),
        (16, 21, -19.55),
    ]]
    chamfer_6_side_2 = [part.faces().sort_by_distance(p)[0] for p in [
        (11.375, 21, 29.37705839),
    ]]
    chamfer_6 = BRepFilletAPI_MakeChamfer(part.part.solid().wrapped)
    for e in chamfer_6_edges_1:
        chamfer_6.Add(CHAMFER_6_SIZE, CHAMFER_6_SIZE2, e.wrapped, chamfer_6_side_1[0].wrapped)  # the first distance lies on this face
    for e in chamfer_6_edges_2:
        chamfer_6.Add(CHAMFER_6_SIZE, CHAMFER_6_SIZE2, e.wrapped, chamfer_6_side_2[0].wrapped)  # the first distance lies on this face
    add(Compound.cast(chamfer_6.Shape()), mode=Mode.REPLACE)

    # Скругление5
    fillet_5_edges = [part.edges().sort_by_distance(p)[0] for p in [
        (0, 3, -30),
        (-12.75, 12, -30),
        (12.75, 12, -30),
    ]]
    fillet(fillet_5_edges, radius=FILLET_5_R)

    # Скругление7
    fillet_7_edges = [part.edges().sort_by_distance(p)[0] for p in [
        (19, 12, 16.197224362),
        (19, 12, 19.802775638),
        (-19, 12, 19.802775638),
        (-19, 12, 16.197224362),
        (19, 12, -16.197224362),
        (19, 12, -19.802775638),
        (-19, 12, -19.802775638),
        (-19, 12, -16.197224362),
    ]]
    fillet(fillet_7_edges, radius=FILLET_7_R)


solid = part.part
